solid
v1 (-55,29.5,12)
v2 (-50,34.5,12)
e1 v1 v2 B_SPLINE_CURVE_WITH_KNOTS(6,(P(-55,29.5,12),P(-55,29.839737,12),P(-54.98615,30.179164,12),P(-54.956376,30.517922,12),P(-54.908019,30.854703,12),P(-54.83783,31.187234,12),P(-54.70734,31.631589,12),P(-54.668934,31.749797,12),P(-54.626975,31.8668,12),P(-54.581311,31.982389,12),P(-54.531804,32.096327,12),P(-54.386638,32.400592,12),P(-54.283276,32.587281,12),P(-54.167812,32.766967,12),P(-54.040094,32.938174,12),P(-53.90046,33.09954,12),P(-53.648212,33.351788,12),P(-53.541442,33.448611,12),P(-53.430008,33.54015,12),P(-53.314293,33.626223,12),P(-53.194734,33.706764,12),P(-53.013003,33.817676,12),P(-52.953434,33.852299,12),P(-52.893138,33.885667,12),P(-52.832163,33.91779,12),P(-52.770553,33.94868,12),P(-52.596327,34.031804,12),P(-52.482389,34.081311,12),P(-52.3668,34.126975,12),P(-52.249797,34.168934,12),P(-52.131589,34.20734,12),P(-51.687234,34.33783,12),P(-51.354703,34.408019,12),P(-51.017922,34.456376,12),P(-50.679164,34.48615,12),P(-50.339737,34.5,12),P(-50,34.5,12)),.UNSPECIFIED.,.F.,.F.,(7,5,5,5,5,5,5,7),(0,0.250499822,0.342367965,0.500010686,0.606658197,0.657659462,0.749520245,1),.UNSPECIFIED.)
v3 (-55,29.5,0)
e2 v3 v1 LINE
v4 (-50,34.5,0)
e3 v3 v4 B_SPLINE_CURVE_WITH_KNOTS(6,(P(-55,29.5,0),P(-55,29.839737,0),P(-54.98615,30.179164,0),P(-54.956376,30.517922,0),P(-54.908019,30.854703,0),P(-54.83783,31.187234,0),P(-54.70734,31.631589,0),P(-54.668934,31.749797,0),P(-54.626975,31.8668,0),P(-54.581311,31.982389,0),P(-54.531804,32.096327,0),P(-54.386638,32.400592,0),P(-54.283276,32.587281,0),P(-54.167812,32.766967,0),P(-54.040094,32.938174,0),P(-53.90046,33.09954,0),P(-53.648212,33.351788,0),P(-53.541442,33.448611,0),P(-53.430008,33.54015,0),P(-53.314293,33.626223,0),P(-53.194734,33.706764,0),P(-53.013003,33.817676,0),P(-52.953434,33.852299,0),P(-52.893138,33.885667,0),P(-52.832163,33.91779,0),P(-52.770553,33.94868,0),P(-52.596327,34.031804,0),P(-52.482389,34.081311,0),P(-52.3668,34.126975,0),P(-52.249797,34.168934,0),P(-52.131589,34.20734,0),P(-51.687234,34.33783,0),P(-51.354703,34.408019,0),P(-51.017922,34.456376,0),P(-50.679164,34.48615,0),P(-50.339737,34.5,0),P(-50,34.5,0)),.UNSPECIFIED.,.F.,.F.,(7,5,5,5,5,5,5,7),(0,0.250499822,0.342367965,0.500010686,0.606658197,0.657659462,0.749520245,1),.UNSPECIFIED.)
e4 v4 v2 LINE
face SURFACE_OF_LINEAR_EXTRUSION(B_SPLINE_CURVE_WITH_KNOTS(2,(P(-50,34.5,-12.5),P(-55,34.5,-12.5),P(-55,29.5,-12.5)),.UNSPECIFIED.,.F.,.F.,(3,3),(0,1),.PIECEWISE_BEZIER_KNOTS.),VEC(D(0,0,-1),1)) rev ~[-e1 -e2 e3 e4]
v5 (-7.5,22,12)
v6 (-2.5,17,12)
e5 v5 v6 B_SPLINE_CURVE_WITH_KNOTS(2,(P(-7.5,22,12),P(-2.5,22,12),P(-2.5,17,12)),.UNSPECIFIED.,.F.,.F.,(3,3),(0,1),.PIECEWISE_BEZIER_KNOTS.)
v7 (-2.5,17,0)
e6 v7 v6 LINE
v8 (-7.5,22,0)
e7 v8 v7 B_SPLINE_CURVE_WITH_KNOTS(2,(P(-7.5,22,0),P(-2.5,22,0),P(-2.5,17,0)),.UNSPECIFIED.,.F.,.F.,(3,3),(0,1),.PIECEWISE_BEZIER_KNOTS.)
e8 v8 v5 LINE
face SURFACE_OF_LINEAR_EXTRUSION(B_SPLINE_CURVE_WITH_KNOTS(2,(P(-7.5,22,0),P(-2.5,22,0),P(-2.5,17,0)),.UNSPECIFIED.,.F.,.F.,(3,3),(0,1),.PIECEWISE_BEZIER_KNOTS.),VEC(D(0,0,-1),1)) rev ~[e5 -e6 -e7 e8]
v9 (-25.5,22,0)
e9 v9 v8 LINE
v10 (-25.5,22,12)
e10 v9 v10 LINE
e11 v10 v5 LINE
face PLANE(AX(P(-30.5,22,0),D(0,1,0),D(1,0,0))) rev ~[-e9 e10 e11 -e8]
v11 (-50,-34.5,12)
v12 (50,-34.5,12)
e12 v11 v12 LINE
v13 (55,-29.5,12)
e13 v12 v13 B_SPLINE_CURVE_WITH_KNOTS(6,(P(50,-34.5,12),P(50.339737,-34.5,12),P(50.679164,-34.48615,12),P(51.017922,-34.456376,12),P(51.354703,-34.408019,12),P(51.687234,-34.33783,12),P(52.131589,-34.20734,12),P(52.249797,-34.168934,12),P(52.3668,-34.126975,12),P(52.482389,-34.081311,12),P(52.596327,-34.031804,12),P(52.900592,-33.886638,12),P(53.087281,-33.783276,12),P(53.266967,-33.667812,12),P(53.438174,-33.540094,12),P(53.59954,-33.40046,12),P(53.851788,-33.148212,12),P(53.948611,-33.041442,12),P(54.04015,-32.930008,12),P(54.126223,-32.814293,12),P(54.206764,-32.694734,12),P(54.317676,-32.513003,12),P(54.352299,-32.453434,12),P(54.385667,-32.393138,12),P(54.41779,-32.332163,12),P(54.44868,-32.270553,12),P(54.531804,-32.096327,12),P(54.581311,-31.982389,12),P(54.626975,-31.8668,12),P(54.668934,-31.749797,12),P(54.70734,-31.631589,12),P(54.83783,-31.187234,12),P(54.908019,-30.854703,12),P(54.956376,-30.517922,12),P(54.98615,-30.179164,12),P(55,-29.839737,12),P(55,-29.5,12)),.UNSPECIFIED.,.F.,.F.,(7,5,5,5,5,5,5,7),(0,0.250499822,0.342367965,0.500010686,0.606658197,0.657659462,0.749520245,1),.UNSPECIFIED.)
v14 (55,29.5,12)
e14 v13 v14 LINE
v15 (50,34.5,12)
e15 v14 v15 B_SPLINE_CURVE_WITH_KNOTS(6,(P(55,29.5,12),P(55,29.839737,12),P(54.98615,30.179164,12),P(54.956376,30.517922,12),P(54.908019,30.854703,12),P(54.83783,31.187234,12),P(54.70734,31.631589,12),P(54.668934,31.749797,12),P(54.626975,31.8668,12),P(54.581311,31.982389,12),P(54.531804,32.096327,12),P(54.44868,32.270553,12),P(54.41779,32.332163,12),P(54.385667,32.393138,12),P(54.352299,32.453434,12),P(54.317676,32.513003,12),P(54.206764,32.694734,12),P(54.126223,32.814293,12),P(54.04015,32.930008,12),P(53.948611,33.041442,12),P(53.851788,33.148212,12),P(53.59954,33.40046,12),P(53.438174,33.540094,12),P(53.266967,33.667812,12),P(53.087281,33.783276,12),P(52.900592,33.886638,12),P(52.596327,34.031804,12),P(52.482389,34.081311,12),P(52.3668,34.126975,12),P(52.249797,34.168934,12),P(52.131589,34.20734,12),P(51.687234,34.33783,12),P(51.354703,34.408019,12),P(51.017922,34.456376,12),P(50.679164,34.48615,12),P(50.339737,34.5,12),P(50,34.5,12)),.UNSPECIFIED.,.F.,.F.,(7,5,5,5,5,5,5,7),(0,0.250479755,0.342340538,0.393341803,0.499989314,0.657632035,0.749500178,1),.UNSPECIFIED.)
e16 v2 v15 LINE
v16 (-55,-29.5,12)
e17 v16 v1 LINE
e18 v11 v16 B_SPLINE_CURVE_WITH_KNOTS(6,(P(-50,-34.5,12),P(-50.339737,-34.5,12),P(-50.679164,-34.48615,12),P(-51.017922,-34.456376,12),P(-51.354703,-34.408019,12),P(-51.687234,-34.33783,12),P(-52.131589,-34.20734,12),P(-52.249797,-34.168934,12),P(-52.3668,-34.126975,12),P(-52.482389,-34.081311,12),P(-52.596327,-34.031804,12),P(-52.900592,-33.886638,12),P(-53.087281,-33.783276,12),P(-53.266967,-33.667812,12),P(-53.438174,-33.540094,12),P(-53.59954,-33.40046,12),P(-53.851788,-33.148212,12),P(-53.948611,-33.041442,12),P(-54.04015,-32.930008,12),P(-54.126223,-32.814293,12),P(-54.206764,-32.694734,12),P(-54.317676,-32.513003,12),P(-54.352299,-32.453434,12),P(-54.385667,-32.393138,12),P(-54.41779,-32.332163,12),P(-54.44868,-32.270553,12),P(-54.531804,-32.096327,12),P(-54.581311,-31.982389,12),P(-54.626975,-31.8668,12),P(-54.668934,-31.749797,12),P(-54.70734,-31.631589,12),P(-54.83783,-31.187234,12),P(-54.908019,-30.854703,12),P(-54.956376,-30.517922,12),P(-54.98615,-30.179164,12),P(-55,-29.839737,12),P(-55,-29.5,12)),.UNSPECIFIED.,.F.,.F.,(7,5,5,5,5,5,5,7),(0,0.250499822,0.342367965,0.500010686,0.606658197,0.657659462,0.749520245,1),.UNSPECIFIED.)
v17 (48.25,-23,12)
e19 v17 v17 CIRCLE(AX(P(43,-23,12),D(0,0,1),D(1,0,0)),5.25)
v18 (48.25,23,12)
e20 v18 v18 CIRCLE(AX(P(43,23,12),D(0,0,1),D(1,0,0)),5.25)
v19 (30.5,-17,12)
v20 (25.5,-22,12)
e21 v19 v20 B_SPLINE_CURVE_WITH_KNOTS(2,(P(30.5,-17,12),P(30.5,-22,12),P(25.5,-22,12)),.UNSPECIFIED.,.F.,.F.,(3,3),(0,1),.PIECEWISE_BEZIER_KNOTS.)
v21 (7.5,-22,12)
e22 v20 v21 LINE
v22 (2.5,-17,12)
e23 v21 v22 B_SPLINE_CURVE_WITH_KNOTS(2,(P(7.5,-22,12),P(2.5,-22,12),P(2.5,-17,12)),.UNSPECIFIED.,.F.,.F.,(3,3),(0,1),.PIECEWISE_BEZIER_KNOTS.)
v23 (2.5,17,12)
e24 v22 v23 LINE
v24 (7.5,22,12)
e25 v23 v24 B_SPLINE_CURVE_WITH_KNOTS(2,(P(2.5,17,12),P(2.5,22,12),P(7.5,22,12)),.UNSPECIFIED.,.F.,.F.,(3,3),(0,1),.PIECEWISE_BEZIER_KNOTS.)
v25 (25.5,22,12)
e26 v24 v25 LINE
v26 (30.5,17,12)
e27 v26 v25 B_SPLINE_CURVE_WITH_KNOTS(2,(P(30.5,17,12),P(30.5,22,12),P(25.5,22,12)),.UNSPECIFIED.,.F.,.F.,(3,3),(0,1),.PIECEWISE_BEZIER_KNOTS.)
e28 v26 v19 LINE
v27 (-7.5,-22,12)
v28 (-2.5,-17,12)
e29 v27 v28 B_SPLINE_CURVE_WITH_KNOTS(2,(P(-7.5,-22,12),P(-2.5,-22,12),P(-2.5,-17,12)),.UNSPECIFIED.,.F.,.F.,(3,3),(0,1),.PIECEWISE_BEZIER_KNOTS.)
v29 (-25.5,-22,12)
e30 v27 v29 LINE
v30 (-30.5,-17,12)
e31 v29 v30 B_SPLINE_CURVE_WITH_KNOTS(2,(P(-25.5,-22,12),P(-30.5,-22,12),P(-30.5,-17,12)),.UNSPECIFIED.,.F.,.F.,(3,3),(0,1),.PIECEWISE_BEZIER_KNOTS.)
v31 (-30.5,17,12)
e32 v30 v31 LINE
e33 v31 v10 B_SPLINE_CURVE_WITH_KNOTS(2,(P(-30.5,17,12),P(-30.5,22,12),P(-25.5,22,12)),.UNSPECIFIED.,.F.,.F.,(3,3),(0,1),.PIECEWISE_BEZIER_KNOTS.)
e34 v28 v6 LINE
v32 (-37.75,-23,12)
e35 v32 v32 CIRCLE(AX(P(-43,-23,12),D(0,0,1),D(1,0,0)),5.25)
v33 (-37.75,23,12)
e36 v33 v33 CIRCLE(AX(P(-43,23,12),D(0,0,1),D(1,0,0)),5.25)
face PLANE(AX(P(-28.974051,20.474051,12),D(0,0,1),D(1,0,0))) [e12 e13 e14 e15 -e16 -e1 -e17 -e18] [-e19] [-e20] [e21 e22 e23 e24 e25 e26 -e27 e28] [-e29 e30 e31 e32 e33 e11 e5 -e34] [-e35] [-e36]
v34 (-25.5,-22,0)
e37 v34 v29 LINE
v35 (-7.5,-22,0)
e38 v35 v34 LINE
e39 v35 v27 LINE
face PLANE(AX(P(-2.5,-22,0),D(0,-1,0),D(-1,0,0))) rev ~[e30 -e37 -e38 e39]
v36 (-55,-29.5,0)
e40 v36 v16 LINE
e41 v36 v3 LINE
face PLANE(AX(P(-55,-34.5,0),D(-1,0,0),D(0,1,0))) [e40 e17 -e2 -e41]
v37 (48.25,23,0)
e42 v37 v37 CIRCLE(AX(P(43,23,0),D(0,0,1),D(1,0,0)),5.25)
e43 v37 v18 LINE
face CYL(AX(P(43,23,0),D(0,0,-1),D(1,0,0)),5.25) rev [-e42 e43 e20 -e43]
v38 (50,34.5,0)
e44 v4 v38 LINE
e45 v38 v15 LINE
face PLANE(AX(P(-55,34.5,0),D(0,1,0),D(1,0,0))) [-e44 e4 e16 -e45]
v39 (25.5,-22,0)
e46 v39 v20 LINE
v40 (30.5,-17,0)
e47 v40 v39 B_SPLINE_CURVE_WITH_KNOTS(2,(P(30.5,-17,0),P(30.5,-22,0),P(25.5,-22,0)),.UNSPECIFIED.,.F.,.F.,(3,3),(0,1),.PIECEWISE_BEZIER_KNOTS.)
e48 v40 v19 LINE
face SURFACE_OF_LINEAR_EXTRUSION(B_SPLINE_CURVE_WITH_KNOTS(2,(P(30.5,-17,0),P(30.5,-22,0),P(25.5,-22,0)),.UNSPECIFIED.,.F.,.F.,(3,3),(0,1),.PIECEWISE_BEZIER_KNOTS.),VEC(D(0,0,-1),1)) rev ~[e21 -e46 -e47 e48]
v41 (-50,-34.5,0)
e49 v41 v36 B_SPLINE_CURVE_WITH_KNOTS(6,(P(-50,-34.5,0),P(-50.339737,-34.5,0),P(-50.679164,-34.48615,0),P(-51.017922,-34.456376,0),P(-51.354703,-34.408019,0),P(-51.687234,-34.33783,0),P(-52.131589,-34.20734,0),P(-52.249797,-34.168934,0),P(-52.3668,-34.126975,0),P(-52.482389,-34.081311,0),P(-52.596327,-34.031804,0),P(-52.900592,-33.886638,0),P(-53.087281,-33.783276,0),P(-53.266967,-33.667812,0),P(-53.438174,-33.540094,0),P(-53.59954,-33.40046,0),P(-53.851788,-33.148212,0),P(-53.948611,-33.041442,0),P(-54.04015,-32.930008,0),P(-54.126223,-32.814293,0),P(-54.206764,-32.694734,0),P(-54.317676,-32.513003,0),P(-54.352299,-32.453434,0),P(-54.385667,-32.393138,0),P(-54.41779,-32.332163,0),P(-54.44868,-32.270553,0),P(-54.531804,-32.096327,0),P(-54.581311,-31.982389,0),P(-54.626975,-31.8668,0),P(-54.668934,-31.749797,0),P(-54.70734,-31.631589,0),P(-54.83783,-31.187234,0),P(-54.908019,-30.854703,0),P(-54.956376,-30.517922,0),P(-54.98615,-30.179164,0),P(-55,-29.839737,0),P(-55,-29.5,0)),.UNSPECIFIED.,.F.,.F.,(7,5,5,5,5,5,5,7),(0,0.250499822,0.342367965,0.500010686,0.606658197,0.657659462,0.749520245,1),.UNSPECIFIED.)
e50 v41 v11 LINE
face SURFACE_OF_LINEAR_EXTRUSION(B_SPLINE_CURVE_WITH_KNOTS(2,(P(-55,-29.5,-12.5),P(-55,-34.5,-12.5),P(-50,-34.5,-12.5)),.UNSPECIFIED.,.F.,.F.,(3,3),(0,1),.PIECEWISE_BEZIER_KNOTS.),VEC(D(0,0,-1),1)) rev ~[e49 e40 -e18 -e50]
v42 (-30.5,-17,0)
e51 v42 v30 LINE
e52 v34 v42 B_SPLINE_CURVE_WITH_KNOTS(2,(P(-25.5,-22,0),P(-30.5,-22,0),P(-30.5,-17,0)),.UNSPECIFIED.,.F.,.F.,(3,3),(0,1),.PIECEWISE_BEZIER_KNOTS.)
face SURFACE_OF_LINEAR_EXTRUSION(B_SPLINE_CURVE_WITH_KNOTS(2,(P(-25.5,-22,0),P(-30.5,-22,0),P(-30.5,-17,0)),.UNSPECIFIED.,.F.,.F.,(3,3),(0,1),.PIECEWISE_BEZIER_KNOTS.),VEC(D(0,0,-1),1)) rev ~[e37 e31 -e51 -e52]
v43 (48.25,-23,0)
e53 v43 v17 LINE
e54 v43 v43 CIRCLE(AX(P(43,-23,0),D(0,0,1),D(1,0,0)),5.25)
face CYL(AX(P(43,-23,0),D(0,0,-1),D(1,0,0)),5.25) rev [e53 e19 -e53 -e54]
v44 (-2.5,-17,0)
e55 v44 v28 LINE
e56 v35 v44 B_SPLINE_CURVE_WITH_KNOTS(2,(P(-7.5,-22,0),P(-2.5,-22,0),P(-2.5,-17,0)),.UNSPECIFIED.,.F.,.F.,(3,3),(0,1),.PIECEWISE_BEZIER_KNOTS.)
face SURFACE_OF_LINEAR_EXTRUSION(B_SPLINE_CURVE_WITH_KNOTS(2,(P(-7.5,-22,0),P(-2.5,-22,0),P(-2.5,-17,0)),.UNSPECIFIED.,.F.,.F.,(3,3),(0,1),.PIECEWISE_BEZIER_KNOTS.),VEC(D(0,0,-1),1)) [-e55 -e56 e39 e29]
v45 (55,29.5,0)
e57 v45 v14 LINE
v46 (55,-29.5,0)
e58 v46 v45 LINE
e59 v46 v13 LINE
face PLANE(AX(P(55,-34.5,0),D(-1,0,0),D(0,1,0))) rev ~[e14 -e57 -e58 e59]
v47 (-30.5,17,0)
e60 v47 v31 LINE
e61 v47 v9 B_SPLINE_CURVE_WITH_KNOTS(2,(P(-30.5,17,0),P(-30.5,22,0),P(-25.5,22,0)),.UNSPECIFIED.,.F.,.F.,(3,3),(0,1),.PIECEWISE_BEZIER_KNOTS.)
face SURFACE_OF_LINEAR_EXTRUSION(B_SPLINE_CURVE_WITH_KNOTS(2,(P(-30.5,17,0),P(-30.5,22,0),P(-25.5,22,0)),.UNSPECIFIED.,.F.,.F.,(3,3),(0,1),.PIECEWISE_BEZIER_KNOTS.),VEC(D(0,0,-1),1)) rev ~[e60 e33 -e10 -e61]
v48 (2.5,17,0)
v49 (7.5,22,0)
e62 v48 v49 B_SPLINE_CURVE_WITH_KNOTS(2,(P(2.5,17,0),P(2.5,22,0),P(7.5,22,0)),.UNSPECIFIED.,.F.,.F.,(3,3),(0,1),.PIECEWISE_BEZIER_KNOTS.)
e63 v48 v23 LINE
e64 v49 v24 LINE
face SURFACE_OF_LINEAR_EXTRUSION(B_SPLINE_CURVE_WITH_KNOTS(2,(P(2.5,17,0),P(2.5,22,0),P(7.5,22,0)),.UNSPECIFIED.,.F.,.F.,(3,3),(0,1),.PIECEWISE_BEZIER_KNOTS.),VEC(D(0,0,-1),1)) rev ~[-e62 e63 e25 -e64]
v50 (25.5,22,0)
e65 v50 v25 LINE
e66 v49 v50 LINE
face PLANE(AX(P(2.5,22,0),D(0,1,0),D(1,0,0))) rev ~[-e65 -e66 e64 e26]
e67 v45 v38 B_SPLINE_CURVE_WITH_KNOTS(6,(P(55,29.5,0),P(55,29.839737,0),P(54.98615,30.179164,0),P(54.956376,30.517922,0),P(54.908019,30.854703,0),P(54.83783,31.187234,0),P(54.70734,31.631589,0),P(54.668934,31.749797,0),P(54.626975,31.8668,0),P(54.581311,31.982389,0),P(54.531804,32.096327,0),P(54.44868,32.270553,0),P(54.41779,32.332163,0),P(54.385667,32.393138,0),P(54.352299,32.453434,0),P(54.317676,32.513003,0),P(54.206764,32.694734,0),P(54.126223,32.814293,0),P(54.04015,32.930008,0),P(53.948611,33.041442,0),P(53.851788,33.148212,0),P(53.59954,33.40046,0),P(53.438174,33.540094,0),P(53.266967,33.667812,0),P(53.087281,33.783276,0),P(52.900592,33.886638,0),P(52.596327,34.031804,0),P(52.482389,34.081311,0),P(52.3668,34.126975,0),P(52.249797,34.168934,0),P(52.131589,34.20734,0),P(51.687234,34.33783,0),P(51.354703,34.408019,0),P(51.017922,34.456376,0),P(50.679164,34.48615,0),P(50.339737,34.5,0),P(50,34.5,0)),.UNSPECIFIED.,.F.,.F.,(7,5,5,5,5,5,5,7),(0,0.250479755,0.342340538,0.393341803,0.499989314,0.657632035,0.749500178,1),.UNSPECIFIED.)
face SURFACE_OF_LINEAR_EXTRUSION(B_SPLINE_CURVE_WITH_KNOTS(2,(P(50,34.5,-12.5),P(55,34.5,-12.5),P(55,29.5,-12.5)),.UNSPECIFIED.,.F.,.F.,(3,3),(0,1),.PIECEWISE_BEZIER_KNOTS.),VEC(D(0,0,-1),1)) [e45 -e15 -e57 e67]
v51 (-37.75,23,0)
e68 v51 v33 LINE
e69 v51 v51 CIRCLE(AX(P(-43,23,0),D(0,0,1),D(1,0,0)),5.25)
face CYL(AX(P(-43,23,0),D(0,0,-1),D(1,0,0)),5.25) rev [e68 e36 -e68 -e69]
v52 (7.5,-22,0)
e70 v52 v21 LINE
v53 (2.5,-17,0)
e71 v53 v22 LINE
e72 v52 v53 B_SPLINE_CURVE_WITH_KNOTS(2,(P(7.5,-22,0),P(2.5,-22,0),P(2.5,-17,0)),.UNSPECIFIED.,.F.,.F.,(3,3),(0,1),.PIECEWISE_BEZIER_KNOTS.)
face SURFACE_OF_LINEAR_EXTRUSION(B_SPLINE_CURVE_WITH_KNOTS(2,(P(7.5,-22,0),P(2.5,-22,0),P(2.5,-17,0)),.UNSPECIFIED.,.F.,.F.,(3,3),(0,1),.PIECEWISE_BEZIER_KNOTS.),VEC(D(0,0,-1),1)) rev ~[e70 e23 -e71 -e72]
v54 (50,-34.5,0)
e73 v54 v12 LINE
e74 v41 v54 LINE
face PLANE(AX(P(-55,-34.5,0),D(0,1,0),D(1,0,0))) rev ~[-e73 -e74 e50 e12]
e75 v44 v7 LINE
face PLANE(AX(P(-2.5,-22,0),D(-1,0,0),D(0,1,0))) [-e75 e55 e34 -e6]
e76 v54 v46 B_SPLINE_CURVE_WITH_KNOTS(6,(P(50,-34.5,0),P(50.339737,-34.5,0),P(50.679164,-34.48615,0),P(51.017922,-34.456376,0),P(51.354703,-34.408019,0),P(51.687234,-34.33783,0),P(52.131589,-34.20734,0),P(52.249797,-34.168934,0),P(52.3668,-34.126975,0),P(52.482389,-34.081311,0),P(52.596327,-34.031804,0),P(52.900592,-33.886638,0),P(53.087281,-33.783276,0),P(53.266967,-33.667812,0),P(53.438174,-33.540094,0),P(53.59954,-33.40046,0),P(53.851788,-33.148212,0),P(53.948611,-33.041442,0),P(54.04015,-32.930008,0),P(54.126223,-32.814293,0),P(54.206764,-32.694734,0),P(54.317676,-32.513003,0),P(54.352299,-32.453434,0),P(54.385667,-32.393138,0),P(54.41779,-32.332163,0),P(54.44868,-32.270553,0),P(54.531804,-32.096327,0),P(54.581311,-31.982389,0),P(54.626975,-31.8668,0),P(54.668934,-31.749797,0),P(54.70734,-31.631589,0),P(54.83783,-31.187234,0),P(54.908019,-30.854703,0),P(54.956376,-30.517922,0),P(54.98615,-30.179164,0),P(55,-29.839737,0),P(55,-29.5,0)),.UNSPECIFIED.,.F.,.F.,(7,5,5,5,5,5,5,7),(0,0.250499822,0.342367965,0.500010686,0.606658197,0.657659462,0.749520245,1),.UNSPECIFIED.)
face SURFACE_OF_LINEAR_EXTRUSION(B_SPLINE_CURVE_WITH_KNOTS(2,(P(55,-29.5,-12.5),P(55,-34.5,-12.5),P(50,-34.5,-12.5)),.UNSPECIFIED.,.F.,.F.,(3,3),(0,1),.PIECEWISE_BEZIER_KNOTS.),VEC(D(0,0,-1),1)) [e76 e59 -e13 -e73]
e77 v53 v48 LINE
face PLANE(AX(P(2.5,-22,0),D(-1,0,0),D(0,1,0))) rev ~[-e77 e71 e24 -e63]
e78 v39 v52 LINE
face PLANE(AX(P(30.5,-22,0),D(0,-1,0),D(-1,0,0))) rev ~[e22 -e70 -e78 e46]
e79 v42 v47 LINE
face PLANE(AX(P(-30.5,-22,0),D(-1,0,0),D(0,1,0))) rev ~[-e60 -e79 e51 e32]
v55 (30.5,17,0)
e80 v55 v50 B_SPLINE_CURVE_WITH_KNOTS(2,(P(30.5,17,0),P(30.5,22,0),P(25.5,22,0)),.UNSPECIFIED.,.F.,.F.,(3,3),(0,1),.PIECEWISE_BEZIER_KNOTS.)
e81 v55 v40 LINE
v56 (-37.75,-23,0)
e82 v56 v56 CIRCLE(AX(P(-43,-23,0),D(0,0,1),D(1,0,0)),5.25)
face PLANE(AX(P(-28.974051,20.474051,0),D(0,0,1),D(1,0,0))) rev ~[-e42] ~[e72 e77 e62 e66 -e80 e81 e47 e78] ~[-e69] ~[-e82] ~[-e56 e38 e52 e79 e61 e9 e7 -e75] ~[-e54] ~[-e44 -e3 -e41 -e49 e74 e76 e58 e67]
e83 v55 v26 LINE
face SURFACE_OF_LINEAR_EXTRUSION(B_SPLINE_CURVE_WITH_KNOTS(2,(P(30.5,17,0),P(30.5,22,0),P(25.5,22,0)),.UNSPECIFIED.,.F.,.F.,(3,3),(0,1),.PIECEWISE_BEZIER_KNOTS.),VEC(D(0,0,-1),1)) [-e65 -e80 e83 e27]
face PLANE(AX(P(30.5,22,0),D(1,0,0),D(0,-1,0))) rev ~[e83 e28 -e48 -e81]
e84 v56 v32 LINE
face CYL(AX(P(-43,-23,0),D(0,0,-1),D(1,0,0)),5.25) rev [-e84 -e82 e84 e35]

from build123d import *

# Parameters (mm, degrees)
F0_W        = 110
F0_H        = 69
F0_R        = 5.25
F0_W_2      = 5
F0_H_2      = 44
F1_DEPTH    = 12
F2_T1_DEPTH = 12
F2_T3_DEPTH = 37


# Not quite as in the source:
# - a fillet or chamfer that OpenCascade refuses, or shapes differently, is made with other operations: its cross-section is extruded or revolved along the edge and cut away or added


with BuildPart() as f1:
    # F0 (on Top) → F1 (new body)
    with BuildSketch(Plane.XY):
        Rectangle(F0_W, F0_H)
        with Locations((-43, -23)):
            Circle(F0_R, mode=Mode.SUBTRACT)
        with Locations((43, -23)):
            Circle(F0_R, mode=Mode.SUBTRACT)
        with Locations((-43, 23)):
            Circle(F0_R, mode=Mode.SUBTRACT)
        Polygon((30.5, 22), (30.5, -22), (2.5, -22), (-2.5, -22), (-30.5, -22), (-30.5, 22), (-2.5, 22), (2.5, 22), align=None, mode=Mode.SUBTRACT)
        with Locations((43, 23)):
            Circle(F0_R, mode=Mode.SUBTRACT)
        Rectangle(F0_W_2, F0_H_2)
    extrude(amount=F1_DEPTH)

    # F2: fillet of radius 5 on 12 edges, made by hand

    # F2_s2 → F2_t1 (join)
    with BuildSketch(Plane.XY):
        with BuildLine():
            add(Edge.make_bspline(
                [(-30.5, 17), (-30.5, 22), (-25.5, 22)],
                knots=[0, 0, 0, 1, 1, 1], degree=2, weights=[1, 1, 1]))
            Line((-25.5, 22), (-30.5, 22))
            Line((-30.5, 22), (-30.5, 17))
        make_face()
        with BuildLine():
            add(Edge.make_bspline(
                [(2.5, 17), (2.5, 22), (7.5, 22)],
                knots=[0, 0, 0, 1, 1, 1], degree=2, weights=[1, 1, 1]))
            Line((7.5, 22), (2.5, 22))
            Line((2.5, 22), (2.5, 17))
        make_face()
        with BuildLine():
            add(Edge.make_bspline(
                [(30.5, -17), (30.5, -22), (25.5, -22)],
                knots=[0, 0, 0, 1, 1, 1], degree=2, weights=[1, 1, 1]))
            Line((25.5, -22), (30.5, -22))
            Line((30.5, -22), (30.5, -17))
        make_face()
        with BuildLine():
            add(Edge.make_bspline(
                [(-7.5, -22), (-2.5, -22), (-2.5, -17)],
                knots=[0, 0, 0, 1, 1, 1], degree=2, weights=[1, 1, 1]))
            Line((-2.5, -17), (-2.5, -22))
            Line((-2.5, -22), (-7.5, -22))
        make_face()
        with BuildLine():
            add(Edge.make_bspline(
                [(30.5, 17), (30.5, 22), (25.5, 22)],
                knots=[0, 0, 0, 1, 1, 1], degree=2, weights=[1, 1, 1]))
            Line((25.5, 22), (30.5, 22))
            Line((30.5, 22), (30.5, 17))
        make_face()
        with BuildLine():
            add(Edge.make_bspline(
                [(-7.5, 22), (-2.5, 22), (-2.5, 17)],
                knots=[0, 0, 0, 1, 1, 1], degree=2, weights=[1, 1, 1]))
            Line((-2.5, 17), (-2.5, 22))
            Line((-2.5, 22), (-7.5, 22))
        make_face()
        with BuildLine():
            add(Edge.make_bspline(
                [(-25.5, -22), (-30.5, -22), (-30.5, -17)],
                knots=[0, 0, 0, 1, 1, 1], degree=2, weights=[1, 1, 1]))
            Line((-30.5, -17), (-30.5, -22))
            Line((-30.5, -22), (-25.5, -22))
        make_face()
        with BuildLine():
            add(Edge.make_bspline(
                [(7.5, -22), (2.5, -22), (2.5, -17)],
                knots=[0, 0, 0, 1, 1, 1], degree=2, weights=[1, 1, 1]))
            Line((2.5, -17), (2.5, -22))
            Line((2.5, -22), (7.5, -22))
        make_face()
    extrude(amount=F2_T1_DEPTH)

    # F2_s4 → F2_t3 (cut)
    with BuildSketch(Plane.XY.offset(-12.5)):
        with BuildLine():
            add(Edge.make_bspline(
                [(55, -29.5), (55, -34.5), (50, -34.5)],
                knots=[0, 0, 0, 1, 1, 1], degree=2, weights=[1, 1, 1]))
            Line((50, -34.5), (55, -34.5))
            Line((55, -34.5), (55, -29.5))
        make_face()
        with BuildLine():
            add(Edge.make_bspline(
                [(50, 34.5), (55, 34.5), (55, 29.5)],
                knots=[0, 0, 0, 1, 1, 1], degree=2, weights=[1, 1, 1]))
            Line((55, 29.5), (55, 34.5))
            Line((55, 34.5), (50, 34.5))
        make_face()
        with BuildLine():
            add(Edge.make_bspline(
                [(-55, -29.5), (-55, -34.5), (-50, -34.5)],
                knots=[0, 0, 0, 1, 1, 1], degree=2, weights=[1, 1, 1]))
            Line((-50, -34.5), (-55, -34.5))
            Line((-55, -34.5), (-55, -29.5))
        make_face()
        with BuildLine():
            add(Edge.make_bspline(
                [(-50, 34.5), (-55, 34.5), (-55, 29.5)],
                knots=[0, 0, 0, 1, 1, 1], degree=2, weights=[1, 1, 1]))
            Line((-55, 29.5), (-55, 34.5))
            Line((-55, 34.5), (-50, 34.5))
        make_face()
    extrude(amount=F2_T3_DEPTH, mode=Mode.SUBTRACT)


solid = f1.part
